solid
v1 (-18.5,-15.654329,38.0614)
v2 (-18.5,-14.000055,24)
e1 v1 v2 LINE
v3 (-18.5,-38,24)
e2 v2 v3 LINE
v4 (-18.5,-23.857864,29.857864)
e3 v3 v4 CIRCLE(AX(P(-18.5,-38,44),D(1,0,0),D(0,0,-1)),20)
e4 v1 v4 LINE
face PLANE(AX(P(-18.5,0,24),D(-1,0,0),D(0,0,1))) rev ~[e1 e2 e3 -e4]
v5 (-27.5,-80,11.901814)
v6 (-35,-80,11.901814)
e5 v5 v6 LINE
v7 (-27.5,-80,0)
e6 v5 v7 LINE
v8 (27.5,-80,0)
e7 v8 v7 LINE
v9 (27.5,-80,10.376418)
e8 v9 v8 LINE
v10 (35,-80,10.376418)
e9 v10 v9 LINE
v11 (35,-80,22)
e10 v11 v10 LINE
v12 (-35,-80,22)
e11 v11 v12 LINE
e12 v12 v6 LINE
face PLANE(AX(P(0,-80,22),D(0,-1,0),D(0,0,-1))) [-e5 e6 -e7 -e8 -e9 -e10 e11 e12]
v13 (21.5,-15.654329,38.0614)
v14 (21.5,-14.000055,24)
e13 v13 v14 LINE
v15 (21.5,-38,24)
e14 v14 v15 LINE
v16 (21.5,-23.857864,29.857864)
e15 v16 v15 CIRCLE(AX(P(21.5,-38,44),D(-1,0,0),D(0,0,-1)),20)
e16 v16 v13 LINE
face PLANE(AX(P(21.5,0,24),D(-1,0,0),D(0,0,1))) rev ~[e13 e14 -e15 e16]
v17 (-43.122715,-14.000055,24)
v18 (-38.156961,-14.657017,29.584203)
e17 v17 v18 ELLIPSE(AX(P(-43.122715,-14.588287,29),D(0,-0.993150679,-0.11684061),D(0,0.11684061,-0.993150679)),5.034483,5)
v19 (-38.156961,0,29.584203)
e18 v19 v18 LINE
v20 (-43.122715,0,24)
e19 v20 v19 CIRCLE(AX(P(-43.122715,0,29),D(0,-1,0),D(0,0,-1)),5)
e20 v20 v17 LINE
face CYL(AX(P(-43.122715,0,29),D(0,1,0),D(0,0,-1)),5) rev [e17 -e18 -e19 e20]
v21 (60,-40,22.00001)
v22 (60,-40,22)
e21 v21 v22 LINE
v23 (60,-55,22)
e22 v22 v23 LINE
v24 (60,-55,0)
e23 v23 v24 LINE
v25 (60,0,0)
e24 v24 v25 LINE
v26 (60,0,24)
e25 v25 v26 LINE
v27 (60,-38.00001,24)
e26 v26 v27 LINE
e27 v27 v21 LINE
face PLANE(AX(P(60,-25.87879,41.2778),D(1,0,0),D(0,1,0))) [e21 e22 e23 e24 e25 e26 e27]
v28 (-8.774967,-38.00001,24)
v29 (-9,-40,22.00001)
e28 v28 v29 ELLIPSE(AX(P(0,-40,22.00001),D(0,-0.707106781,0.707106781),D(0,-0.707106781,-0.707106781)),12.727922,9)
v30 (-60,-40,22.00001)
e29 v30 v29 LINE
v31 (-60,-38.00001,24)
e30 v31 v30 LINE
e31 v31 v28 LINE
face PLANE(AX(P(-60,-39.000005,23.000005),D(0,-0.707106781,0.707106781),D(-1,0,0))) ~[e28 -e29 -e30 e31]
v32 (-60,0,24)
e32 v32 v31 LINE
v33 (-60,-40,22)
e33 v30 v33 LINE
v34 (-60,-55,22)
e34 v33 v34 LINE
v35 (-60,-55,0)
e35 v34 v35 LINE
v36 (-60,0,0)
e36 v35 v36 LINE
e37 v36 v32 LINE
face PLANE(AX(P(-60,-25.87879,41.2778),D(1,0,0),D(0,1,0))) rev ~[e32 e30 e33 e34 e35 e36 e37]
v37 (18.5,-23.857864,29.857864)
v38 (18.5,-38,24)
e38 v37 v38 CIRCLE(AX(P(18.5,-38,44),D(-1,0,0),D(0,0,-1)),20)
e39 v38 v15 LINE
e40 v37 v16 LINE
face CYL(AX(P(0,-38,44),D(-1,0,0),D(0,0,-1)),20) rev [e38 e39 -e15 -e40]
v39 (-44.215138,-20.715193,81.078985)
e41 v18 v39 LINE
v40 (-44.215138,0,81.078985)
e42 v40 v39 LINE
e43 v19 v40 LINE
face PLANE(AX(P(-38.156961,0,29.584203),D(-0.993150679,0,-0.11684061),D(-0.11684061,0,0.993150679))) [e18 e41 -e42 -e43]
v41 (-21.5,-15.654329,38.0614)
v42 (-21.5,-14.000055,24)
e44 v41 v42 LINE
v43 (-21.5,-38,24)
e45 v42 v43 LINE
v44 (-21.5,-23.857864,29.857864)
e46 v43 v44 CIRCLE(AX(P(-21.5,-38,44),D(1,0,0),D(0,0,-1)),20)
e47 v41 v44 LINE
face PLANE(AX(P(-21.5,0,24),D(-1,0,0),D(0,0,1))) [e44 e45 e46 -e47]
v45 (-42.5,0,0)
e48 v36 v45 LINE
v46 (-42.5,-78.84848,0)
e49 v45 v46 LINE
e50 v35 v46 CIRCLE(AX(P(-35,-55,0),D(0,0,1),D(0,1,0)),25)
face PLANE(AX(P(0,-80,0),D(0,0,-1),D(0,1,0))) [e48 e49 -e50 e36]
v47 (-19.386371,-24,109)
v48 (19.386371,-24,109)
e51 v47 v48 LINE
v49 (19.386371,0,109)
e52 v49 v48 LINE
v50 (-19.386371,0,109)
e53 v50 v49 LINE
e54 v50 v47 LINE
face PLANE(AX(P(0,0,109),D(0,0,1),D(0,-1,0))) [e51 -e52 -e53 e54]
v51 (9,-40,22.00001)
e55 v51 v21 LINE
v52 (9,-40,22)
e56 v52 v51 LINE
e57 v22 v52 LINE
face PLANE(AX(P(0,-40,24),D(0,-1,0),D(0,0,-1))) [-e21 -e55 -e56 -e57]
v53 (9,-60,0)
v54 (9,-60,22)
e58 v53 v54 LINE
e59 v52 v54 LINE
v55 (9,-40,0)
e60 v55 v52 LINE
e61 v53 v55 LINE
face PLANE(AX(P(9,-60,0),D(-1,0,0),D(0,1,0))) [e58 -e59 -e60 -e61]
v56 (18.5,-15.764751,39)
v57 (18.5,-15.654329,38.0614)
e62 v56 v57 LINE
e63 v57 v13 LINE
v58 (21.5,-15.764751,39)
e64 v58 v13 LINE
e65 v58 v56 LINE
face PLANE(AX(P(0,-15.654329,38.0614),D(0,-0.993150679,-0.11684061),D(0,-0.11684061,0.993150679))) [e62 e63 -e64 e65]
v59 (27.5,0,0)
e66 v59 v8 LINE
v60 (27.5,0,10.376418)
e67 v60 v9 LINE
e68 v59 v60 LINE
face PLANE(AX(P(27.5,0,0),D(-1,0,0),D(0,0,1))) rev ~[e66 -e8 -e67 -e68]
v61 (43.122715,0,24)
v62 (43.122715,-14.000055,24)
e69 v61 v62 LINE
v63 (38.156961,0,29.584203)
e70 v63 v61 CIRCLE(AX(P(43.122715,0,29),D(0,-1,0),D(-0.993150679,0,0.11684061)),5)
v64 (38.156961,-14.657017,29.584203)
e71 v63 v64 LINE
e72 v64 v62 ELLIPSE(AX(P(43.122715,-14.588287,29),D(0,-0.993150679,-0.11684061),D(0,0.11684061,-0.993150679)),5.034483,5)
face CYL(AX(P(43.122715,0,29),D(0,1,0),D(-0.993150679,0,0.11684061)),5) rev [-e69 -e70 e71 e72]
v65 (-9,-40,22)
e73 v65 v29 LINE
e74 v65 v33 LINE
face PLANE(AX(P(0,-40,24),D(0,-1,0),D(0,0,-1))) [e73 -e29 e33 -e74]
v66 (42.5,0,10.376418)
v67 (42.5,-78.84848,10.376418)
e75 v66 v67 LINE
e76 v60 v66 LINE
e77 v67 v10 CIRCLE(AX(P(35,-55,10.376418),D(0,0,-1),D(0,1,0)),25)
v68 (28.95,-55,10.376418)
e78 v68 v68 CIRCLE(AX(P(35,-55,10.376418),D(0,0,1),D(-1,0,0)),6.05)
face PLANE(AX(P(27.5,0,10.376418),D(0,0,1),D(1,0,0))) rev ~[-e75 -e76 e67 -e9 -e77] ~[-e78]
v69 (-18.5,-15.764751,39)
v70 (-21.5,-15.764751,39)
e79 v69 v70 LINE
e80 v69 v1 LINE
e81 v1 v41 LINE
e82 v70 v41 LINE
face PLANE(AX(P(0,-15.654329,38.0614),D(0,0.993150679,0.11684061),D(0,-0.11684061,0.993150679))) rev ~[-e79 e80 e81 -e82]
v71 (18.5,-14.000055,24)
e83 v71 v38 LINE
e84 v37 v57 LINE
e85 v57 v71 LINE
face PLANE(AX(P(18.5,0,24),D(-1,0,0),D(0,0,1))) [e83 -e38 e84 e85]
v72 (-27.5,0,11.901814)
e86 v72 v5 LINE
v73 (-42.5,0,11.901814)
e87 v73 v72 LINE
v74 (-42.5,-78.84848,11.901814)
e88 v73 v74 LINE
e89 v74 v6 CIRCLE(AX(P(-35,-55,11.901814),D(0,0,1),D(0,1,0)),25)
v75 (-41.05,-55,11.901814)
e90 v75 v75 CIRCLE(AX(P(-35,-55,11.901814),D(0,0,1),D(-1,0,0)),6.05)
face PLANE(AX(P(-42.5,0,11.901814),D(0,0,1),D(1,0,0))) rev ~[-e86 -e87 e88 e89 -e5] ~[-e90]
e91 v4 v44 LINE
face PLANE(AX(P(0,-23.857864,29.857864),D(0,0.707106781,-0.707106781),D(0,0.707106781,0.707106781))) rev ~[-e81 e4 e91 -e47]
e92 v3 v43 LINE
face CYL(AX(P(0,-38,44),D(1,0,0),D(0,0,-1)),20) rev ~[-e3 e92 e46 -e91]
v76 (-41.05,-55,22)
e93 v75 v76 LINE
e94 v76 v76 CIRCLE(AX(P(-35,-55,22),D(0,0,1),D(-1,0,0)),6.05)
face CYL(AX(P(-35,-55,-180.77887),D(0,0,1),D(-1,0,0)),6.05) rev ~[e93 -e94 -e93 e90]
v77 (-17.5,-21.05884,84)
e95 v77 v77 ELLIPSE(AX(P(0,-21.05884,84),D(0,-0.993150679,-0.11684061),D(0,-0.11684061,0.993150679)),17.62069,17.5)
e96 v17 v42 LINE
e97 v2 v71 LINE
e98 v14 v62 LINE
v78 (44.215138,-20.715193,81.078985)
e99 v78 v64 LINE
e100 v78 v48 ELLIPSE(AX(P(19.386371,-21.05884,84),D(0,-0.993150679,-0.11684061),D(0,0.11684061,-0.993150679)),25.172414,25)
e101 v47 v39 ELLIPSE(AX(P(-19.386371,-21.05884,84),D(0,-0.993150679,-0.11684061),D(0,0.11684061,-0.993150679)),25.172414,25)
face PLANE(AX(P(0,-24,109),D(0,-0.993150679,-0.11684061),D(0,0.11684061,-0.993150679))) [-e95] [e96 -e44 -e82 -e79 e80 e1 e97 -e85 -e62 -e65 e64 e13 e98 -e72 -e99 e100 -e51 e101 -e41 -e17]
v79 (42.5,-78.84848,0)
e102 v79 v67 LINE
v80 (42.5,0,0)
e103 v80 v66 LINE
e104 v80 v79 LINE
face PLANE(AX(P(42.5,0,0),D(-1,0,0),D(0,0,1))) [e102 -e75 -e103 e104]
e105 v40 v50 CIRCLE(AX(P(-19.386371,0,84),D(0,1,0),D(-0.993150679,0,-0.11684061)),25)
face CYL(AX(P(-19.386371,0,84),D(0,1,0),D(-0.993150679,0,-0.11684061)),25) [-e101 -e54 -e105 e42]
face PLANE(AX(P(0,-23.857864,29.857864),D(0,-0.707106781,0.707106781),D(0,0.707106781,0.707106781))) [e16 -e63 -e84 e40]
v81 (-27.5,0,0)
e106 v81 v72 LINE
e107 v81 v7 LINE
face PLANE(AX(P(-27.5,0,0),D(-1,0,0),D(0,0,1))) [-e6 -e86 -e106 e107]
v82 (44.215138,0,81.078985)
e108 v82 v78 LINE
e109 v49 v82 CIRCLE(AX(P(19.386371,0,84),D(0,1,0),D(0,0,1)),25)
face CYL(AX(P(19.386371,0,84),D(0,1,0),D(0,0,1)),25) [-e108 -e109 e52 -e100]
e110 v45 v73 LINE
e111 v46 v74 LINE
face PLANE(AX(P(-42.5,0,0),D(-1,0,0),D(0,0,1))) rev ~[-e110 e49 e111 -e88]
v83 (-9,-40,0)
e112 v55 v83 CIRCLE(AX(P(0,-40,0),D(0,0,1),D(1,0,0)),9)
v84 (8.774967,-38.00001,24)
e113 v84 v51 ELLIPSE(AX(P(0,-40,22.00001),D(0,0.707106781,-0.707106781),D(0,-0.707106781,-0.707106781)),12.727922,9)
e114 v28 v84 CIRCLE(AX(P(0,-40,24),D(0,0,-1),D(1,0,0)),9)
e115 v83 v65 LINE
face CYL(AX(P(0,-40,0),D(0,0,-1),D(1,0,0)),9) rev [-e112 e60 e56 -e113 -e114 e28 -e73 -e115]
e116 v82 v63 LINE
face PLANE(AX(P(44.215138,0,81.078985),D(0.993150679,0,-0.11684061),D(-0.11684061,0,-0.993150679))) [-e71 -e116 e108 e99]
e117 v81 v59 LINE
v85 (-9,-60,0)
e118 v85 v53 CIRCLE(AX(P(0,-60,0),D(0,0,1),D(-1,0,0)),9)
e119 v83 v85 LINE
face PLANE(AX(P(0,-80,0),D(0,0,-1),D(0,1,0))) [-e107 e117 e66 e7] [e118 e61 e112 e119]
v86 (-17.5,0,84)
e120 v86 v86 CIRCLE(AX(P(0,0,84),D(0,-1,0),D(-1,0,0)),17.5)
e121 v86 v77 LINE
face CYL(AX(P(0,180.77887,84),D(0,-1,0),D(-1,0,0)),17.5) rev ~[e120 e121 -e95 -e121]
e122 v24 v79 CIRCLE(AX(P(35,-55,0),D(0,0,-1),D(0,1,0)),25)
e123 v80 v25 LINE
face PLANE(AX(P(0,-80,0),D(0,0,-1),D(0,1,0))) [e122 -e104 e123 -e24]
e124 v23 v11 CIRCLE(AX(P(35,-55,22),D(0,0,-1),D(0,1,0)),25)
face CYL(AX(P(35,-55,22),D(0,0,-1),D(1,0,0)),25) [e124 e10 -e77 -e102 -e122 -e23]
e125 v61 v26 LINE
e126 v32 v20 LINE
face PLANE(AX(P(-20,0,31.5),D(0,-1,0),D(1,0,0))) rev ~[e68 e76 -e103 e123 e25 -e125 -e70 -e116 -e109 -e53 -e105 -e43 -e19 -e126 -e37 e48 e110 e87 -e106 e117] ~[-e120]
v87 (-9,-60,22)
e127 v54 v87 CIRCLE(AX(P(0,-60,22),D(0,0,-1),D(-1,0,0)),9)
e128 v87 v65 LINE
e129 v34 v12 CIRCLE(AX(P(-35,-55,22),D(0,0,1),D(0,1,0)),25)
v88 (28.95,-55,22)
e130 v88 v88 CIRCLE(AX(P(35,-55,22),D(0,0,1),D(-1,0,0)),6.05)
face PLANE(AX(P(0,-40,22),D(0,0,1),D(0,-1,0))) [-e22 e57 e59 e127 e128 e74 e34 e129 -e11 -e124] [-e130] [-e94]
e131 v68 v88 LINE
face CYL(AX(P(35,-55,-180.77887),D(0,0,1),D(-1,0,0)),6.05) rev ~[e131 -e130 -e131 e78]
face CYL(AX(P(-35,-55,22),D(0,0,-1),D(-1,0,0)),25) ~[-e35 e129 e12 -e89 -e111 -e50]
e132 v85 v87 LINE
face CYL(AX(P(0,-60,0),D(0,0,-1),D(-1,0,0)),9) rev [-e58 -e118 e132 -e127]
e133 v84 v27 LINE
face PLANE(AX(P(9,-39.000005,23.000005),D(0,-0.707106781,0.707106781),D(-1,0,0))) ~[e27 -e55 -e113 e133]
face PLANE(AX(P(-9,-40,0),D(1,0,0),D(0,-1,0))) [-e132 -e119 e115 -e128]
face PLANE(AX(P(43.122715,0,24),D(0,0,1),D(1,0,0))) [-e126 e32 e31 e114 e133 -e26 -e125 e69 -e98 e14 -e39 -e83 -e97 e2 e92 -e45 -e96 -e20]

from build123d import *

# Parameters (mm, degrees)
F1_DEPTH      = 60
F2_W          = 15
F2_H          = 11.9018135592
F2_H_2        = 10.3764180094
F3_DEPTH      = 80.001
F5_DEPTH      = 80.001
F6_W          = 3
F6_H          = 15
F7_DEPTH      = 40
F9_DEPTH      = 60.001
F9_DEPTH_BACK = 60.001
F11_D         = 12.1
F13_DEPTH     = 109.001
F15_D         = 35
F16_R         = 25
F17_SIZE      = 1.99999


# Not quite as in the source:
# - a fillet or chamfer is up to 0.001 mm smaller than in the source, because OpenCascade refuses the exact size


with BuildPart() as f1:
    # F0 (on Right) → F1 (new body, symmetric)
    with BuildSketch(Plane.YZ):
        Polygon((-80, 0), (0, 0), (0, 109), (-24, 109), (-14.0000553612, 24), (-40, 24), (-40, 22), (-80, 22), align=None)
    extrude(amount=F1_DEPTH, both=True)

    # F2 (on Front) → F3 (cut, through all)
    with BuildSketch(Plane.XZ):
        with Locations((-35, 5.9509067796)):
            Rectangle(F2_W, F2_H)
        with Locations((35, 5.1882090047)):
            Rectangle(F2_W, F2_H_2)
    extrude(amount=F3_DEPTH, mode=Mode.SUBTRACT)

    # F4 (on Front) → F5 (cut, through all)
    with BuildSketch(Plane.XZ):
        with BuildLine():
            ThreePointArc((-43.1227148243, 24), (-39.3863385559, 25.6774268435), (-38.1569614274, 29.5842030478))
            Line((-38.1569614274, 29.5842030478), (-44.2151375018, 81.0789847612))
            ThreePointArc((-44.2151375018, 81.0789847612), (-38.0682518594, 100.6128657827), (-19.3863705172, 109))
            Line((-19.3863705172, 109), (0, 109))
            Line((0, 109), (19.3863705172, 109))
            ThreePointArc((19.3863705172, 109), (38.0682518594, 100.6128657827), (44.2151375018, 81.0789847612))
            Line((44.2151375018, 81.0789847612), (38.1569614274, 29.5842030478))
            ThreePointArc((38.1569614274, 29.5842030478), (39.3863385559, 25.6774268435), (43.1227148243, 24))
            Line((43.1227148243, 24), (60, 24))
            Line((60, 24), (60, 136.873498559))
            Line((60, 136.873498559), (-60, 136.873498559))
            Line((-60, 136.873498559), (-60, 24))
            Line((-60, 24), (-43.1227148243, 24))
        make_face()
    extrude(amount=F5_DEPTH, mode=Mode.SUBTRACT)

    # F6 (on Front) → F7 (join, through all)
    with BuildSketch(Plane.XZ):
        with Locations((-20, 31.5)):
            Rectangle(F6_W, F6_H)
        with Locations((20, 31.5)):
            Rectangle(F6_W, F6_H)
    extrude(amount=F7_DEPTH)

    # F8 (on Right) → F9 (cut, two sides)
    with BuildSketch(Plane.YZ) as f9_sk:
        with BuildLine():
            Line((-23.8578643763, 29.8578643763), (-15.6543285765, 38.061400176))
            Line((-15.6543285765, 38.061400176), (-16.3282091593, 43.7894168409))
            Line((-16.3282091593, 43.7894168409), (-43.991163373, 43.7894168409))
            Line((-43.991163373, 43.7894168409), (-43.991163373, 24))
            Line((-43.991163373, 24), (-38, 24))
            ThreePointArc((-38, 24), (-30.3463313527, 25.5224093498), (-23.8578643763, 29.8578643763))
        make_face()
    extrude(amount=-F9_DEPTH, mode=Mode.SUBTRACT)
    extrude(f9_sk.sketch, amount=F9_DEPTH_BACK, mode=Mode.SUBTRACT)

    # F11 (through all)
    with Locations(Plane(origin=(0, 0, 0), x_dir=(1, 0, 0), z_dir=(0, 0, -1))):
        with Locations((-35, 55), (35, 55)):
            Hole(F11_D / 2)

    # F12 (on Top) → F13 (cut, through all)
    with BuildSketch(Plane.XY):
        with BuildLine():
            Line((-9, -40), (-9, -60))
            ThreePointArc((-9, -60), (0, -69), (9, -60))
            Line((9, -60), (9, -40))
            ThreePointArc((9, -40), (0, -31), (-9, -40))
        make_face()
    extrude(amount=F13_DEPTH, mode=Mode.SUBTRACT)

    # F15 (through all)
    with Locations(Plane(origin=(0, 0, 0), x_dir=(1, 0, 0), z_dir=(0, 1, 0))):
        with Locations((0, -84)):
            Hole(F15_D / 2)

    # F16
    f16_edges = [f1.edges().sort_by_distance(p)[0] for p in [
        (-60, -80, 11),
        (60, -80, 11),
    ]]
    fillet(f16_edges, radius=F16_R)

    # F17 (size 2 in the source; OpenCascade refuses exactly that, so slightly less here)
    f17_edges = [f1.edges().sort_by_distance(p)[0] for p in [
        (34.5, -40, 24),
        (-34.5, -40, 24),
    ]]
    chamfer(f17_edges, length=F17_SIZE)


solid = f1.part
